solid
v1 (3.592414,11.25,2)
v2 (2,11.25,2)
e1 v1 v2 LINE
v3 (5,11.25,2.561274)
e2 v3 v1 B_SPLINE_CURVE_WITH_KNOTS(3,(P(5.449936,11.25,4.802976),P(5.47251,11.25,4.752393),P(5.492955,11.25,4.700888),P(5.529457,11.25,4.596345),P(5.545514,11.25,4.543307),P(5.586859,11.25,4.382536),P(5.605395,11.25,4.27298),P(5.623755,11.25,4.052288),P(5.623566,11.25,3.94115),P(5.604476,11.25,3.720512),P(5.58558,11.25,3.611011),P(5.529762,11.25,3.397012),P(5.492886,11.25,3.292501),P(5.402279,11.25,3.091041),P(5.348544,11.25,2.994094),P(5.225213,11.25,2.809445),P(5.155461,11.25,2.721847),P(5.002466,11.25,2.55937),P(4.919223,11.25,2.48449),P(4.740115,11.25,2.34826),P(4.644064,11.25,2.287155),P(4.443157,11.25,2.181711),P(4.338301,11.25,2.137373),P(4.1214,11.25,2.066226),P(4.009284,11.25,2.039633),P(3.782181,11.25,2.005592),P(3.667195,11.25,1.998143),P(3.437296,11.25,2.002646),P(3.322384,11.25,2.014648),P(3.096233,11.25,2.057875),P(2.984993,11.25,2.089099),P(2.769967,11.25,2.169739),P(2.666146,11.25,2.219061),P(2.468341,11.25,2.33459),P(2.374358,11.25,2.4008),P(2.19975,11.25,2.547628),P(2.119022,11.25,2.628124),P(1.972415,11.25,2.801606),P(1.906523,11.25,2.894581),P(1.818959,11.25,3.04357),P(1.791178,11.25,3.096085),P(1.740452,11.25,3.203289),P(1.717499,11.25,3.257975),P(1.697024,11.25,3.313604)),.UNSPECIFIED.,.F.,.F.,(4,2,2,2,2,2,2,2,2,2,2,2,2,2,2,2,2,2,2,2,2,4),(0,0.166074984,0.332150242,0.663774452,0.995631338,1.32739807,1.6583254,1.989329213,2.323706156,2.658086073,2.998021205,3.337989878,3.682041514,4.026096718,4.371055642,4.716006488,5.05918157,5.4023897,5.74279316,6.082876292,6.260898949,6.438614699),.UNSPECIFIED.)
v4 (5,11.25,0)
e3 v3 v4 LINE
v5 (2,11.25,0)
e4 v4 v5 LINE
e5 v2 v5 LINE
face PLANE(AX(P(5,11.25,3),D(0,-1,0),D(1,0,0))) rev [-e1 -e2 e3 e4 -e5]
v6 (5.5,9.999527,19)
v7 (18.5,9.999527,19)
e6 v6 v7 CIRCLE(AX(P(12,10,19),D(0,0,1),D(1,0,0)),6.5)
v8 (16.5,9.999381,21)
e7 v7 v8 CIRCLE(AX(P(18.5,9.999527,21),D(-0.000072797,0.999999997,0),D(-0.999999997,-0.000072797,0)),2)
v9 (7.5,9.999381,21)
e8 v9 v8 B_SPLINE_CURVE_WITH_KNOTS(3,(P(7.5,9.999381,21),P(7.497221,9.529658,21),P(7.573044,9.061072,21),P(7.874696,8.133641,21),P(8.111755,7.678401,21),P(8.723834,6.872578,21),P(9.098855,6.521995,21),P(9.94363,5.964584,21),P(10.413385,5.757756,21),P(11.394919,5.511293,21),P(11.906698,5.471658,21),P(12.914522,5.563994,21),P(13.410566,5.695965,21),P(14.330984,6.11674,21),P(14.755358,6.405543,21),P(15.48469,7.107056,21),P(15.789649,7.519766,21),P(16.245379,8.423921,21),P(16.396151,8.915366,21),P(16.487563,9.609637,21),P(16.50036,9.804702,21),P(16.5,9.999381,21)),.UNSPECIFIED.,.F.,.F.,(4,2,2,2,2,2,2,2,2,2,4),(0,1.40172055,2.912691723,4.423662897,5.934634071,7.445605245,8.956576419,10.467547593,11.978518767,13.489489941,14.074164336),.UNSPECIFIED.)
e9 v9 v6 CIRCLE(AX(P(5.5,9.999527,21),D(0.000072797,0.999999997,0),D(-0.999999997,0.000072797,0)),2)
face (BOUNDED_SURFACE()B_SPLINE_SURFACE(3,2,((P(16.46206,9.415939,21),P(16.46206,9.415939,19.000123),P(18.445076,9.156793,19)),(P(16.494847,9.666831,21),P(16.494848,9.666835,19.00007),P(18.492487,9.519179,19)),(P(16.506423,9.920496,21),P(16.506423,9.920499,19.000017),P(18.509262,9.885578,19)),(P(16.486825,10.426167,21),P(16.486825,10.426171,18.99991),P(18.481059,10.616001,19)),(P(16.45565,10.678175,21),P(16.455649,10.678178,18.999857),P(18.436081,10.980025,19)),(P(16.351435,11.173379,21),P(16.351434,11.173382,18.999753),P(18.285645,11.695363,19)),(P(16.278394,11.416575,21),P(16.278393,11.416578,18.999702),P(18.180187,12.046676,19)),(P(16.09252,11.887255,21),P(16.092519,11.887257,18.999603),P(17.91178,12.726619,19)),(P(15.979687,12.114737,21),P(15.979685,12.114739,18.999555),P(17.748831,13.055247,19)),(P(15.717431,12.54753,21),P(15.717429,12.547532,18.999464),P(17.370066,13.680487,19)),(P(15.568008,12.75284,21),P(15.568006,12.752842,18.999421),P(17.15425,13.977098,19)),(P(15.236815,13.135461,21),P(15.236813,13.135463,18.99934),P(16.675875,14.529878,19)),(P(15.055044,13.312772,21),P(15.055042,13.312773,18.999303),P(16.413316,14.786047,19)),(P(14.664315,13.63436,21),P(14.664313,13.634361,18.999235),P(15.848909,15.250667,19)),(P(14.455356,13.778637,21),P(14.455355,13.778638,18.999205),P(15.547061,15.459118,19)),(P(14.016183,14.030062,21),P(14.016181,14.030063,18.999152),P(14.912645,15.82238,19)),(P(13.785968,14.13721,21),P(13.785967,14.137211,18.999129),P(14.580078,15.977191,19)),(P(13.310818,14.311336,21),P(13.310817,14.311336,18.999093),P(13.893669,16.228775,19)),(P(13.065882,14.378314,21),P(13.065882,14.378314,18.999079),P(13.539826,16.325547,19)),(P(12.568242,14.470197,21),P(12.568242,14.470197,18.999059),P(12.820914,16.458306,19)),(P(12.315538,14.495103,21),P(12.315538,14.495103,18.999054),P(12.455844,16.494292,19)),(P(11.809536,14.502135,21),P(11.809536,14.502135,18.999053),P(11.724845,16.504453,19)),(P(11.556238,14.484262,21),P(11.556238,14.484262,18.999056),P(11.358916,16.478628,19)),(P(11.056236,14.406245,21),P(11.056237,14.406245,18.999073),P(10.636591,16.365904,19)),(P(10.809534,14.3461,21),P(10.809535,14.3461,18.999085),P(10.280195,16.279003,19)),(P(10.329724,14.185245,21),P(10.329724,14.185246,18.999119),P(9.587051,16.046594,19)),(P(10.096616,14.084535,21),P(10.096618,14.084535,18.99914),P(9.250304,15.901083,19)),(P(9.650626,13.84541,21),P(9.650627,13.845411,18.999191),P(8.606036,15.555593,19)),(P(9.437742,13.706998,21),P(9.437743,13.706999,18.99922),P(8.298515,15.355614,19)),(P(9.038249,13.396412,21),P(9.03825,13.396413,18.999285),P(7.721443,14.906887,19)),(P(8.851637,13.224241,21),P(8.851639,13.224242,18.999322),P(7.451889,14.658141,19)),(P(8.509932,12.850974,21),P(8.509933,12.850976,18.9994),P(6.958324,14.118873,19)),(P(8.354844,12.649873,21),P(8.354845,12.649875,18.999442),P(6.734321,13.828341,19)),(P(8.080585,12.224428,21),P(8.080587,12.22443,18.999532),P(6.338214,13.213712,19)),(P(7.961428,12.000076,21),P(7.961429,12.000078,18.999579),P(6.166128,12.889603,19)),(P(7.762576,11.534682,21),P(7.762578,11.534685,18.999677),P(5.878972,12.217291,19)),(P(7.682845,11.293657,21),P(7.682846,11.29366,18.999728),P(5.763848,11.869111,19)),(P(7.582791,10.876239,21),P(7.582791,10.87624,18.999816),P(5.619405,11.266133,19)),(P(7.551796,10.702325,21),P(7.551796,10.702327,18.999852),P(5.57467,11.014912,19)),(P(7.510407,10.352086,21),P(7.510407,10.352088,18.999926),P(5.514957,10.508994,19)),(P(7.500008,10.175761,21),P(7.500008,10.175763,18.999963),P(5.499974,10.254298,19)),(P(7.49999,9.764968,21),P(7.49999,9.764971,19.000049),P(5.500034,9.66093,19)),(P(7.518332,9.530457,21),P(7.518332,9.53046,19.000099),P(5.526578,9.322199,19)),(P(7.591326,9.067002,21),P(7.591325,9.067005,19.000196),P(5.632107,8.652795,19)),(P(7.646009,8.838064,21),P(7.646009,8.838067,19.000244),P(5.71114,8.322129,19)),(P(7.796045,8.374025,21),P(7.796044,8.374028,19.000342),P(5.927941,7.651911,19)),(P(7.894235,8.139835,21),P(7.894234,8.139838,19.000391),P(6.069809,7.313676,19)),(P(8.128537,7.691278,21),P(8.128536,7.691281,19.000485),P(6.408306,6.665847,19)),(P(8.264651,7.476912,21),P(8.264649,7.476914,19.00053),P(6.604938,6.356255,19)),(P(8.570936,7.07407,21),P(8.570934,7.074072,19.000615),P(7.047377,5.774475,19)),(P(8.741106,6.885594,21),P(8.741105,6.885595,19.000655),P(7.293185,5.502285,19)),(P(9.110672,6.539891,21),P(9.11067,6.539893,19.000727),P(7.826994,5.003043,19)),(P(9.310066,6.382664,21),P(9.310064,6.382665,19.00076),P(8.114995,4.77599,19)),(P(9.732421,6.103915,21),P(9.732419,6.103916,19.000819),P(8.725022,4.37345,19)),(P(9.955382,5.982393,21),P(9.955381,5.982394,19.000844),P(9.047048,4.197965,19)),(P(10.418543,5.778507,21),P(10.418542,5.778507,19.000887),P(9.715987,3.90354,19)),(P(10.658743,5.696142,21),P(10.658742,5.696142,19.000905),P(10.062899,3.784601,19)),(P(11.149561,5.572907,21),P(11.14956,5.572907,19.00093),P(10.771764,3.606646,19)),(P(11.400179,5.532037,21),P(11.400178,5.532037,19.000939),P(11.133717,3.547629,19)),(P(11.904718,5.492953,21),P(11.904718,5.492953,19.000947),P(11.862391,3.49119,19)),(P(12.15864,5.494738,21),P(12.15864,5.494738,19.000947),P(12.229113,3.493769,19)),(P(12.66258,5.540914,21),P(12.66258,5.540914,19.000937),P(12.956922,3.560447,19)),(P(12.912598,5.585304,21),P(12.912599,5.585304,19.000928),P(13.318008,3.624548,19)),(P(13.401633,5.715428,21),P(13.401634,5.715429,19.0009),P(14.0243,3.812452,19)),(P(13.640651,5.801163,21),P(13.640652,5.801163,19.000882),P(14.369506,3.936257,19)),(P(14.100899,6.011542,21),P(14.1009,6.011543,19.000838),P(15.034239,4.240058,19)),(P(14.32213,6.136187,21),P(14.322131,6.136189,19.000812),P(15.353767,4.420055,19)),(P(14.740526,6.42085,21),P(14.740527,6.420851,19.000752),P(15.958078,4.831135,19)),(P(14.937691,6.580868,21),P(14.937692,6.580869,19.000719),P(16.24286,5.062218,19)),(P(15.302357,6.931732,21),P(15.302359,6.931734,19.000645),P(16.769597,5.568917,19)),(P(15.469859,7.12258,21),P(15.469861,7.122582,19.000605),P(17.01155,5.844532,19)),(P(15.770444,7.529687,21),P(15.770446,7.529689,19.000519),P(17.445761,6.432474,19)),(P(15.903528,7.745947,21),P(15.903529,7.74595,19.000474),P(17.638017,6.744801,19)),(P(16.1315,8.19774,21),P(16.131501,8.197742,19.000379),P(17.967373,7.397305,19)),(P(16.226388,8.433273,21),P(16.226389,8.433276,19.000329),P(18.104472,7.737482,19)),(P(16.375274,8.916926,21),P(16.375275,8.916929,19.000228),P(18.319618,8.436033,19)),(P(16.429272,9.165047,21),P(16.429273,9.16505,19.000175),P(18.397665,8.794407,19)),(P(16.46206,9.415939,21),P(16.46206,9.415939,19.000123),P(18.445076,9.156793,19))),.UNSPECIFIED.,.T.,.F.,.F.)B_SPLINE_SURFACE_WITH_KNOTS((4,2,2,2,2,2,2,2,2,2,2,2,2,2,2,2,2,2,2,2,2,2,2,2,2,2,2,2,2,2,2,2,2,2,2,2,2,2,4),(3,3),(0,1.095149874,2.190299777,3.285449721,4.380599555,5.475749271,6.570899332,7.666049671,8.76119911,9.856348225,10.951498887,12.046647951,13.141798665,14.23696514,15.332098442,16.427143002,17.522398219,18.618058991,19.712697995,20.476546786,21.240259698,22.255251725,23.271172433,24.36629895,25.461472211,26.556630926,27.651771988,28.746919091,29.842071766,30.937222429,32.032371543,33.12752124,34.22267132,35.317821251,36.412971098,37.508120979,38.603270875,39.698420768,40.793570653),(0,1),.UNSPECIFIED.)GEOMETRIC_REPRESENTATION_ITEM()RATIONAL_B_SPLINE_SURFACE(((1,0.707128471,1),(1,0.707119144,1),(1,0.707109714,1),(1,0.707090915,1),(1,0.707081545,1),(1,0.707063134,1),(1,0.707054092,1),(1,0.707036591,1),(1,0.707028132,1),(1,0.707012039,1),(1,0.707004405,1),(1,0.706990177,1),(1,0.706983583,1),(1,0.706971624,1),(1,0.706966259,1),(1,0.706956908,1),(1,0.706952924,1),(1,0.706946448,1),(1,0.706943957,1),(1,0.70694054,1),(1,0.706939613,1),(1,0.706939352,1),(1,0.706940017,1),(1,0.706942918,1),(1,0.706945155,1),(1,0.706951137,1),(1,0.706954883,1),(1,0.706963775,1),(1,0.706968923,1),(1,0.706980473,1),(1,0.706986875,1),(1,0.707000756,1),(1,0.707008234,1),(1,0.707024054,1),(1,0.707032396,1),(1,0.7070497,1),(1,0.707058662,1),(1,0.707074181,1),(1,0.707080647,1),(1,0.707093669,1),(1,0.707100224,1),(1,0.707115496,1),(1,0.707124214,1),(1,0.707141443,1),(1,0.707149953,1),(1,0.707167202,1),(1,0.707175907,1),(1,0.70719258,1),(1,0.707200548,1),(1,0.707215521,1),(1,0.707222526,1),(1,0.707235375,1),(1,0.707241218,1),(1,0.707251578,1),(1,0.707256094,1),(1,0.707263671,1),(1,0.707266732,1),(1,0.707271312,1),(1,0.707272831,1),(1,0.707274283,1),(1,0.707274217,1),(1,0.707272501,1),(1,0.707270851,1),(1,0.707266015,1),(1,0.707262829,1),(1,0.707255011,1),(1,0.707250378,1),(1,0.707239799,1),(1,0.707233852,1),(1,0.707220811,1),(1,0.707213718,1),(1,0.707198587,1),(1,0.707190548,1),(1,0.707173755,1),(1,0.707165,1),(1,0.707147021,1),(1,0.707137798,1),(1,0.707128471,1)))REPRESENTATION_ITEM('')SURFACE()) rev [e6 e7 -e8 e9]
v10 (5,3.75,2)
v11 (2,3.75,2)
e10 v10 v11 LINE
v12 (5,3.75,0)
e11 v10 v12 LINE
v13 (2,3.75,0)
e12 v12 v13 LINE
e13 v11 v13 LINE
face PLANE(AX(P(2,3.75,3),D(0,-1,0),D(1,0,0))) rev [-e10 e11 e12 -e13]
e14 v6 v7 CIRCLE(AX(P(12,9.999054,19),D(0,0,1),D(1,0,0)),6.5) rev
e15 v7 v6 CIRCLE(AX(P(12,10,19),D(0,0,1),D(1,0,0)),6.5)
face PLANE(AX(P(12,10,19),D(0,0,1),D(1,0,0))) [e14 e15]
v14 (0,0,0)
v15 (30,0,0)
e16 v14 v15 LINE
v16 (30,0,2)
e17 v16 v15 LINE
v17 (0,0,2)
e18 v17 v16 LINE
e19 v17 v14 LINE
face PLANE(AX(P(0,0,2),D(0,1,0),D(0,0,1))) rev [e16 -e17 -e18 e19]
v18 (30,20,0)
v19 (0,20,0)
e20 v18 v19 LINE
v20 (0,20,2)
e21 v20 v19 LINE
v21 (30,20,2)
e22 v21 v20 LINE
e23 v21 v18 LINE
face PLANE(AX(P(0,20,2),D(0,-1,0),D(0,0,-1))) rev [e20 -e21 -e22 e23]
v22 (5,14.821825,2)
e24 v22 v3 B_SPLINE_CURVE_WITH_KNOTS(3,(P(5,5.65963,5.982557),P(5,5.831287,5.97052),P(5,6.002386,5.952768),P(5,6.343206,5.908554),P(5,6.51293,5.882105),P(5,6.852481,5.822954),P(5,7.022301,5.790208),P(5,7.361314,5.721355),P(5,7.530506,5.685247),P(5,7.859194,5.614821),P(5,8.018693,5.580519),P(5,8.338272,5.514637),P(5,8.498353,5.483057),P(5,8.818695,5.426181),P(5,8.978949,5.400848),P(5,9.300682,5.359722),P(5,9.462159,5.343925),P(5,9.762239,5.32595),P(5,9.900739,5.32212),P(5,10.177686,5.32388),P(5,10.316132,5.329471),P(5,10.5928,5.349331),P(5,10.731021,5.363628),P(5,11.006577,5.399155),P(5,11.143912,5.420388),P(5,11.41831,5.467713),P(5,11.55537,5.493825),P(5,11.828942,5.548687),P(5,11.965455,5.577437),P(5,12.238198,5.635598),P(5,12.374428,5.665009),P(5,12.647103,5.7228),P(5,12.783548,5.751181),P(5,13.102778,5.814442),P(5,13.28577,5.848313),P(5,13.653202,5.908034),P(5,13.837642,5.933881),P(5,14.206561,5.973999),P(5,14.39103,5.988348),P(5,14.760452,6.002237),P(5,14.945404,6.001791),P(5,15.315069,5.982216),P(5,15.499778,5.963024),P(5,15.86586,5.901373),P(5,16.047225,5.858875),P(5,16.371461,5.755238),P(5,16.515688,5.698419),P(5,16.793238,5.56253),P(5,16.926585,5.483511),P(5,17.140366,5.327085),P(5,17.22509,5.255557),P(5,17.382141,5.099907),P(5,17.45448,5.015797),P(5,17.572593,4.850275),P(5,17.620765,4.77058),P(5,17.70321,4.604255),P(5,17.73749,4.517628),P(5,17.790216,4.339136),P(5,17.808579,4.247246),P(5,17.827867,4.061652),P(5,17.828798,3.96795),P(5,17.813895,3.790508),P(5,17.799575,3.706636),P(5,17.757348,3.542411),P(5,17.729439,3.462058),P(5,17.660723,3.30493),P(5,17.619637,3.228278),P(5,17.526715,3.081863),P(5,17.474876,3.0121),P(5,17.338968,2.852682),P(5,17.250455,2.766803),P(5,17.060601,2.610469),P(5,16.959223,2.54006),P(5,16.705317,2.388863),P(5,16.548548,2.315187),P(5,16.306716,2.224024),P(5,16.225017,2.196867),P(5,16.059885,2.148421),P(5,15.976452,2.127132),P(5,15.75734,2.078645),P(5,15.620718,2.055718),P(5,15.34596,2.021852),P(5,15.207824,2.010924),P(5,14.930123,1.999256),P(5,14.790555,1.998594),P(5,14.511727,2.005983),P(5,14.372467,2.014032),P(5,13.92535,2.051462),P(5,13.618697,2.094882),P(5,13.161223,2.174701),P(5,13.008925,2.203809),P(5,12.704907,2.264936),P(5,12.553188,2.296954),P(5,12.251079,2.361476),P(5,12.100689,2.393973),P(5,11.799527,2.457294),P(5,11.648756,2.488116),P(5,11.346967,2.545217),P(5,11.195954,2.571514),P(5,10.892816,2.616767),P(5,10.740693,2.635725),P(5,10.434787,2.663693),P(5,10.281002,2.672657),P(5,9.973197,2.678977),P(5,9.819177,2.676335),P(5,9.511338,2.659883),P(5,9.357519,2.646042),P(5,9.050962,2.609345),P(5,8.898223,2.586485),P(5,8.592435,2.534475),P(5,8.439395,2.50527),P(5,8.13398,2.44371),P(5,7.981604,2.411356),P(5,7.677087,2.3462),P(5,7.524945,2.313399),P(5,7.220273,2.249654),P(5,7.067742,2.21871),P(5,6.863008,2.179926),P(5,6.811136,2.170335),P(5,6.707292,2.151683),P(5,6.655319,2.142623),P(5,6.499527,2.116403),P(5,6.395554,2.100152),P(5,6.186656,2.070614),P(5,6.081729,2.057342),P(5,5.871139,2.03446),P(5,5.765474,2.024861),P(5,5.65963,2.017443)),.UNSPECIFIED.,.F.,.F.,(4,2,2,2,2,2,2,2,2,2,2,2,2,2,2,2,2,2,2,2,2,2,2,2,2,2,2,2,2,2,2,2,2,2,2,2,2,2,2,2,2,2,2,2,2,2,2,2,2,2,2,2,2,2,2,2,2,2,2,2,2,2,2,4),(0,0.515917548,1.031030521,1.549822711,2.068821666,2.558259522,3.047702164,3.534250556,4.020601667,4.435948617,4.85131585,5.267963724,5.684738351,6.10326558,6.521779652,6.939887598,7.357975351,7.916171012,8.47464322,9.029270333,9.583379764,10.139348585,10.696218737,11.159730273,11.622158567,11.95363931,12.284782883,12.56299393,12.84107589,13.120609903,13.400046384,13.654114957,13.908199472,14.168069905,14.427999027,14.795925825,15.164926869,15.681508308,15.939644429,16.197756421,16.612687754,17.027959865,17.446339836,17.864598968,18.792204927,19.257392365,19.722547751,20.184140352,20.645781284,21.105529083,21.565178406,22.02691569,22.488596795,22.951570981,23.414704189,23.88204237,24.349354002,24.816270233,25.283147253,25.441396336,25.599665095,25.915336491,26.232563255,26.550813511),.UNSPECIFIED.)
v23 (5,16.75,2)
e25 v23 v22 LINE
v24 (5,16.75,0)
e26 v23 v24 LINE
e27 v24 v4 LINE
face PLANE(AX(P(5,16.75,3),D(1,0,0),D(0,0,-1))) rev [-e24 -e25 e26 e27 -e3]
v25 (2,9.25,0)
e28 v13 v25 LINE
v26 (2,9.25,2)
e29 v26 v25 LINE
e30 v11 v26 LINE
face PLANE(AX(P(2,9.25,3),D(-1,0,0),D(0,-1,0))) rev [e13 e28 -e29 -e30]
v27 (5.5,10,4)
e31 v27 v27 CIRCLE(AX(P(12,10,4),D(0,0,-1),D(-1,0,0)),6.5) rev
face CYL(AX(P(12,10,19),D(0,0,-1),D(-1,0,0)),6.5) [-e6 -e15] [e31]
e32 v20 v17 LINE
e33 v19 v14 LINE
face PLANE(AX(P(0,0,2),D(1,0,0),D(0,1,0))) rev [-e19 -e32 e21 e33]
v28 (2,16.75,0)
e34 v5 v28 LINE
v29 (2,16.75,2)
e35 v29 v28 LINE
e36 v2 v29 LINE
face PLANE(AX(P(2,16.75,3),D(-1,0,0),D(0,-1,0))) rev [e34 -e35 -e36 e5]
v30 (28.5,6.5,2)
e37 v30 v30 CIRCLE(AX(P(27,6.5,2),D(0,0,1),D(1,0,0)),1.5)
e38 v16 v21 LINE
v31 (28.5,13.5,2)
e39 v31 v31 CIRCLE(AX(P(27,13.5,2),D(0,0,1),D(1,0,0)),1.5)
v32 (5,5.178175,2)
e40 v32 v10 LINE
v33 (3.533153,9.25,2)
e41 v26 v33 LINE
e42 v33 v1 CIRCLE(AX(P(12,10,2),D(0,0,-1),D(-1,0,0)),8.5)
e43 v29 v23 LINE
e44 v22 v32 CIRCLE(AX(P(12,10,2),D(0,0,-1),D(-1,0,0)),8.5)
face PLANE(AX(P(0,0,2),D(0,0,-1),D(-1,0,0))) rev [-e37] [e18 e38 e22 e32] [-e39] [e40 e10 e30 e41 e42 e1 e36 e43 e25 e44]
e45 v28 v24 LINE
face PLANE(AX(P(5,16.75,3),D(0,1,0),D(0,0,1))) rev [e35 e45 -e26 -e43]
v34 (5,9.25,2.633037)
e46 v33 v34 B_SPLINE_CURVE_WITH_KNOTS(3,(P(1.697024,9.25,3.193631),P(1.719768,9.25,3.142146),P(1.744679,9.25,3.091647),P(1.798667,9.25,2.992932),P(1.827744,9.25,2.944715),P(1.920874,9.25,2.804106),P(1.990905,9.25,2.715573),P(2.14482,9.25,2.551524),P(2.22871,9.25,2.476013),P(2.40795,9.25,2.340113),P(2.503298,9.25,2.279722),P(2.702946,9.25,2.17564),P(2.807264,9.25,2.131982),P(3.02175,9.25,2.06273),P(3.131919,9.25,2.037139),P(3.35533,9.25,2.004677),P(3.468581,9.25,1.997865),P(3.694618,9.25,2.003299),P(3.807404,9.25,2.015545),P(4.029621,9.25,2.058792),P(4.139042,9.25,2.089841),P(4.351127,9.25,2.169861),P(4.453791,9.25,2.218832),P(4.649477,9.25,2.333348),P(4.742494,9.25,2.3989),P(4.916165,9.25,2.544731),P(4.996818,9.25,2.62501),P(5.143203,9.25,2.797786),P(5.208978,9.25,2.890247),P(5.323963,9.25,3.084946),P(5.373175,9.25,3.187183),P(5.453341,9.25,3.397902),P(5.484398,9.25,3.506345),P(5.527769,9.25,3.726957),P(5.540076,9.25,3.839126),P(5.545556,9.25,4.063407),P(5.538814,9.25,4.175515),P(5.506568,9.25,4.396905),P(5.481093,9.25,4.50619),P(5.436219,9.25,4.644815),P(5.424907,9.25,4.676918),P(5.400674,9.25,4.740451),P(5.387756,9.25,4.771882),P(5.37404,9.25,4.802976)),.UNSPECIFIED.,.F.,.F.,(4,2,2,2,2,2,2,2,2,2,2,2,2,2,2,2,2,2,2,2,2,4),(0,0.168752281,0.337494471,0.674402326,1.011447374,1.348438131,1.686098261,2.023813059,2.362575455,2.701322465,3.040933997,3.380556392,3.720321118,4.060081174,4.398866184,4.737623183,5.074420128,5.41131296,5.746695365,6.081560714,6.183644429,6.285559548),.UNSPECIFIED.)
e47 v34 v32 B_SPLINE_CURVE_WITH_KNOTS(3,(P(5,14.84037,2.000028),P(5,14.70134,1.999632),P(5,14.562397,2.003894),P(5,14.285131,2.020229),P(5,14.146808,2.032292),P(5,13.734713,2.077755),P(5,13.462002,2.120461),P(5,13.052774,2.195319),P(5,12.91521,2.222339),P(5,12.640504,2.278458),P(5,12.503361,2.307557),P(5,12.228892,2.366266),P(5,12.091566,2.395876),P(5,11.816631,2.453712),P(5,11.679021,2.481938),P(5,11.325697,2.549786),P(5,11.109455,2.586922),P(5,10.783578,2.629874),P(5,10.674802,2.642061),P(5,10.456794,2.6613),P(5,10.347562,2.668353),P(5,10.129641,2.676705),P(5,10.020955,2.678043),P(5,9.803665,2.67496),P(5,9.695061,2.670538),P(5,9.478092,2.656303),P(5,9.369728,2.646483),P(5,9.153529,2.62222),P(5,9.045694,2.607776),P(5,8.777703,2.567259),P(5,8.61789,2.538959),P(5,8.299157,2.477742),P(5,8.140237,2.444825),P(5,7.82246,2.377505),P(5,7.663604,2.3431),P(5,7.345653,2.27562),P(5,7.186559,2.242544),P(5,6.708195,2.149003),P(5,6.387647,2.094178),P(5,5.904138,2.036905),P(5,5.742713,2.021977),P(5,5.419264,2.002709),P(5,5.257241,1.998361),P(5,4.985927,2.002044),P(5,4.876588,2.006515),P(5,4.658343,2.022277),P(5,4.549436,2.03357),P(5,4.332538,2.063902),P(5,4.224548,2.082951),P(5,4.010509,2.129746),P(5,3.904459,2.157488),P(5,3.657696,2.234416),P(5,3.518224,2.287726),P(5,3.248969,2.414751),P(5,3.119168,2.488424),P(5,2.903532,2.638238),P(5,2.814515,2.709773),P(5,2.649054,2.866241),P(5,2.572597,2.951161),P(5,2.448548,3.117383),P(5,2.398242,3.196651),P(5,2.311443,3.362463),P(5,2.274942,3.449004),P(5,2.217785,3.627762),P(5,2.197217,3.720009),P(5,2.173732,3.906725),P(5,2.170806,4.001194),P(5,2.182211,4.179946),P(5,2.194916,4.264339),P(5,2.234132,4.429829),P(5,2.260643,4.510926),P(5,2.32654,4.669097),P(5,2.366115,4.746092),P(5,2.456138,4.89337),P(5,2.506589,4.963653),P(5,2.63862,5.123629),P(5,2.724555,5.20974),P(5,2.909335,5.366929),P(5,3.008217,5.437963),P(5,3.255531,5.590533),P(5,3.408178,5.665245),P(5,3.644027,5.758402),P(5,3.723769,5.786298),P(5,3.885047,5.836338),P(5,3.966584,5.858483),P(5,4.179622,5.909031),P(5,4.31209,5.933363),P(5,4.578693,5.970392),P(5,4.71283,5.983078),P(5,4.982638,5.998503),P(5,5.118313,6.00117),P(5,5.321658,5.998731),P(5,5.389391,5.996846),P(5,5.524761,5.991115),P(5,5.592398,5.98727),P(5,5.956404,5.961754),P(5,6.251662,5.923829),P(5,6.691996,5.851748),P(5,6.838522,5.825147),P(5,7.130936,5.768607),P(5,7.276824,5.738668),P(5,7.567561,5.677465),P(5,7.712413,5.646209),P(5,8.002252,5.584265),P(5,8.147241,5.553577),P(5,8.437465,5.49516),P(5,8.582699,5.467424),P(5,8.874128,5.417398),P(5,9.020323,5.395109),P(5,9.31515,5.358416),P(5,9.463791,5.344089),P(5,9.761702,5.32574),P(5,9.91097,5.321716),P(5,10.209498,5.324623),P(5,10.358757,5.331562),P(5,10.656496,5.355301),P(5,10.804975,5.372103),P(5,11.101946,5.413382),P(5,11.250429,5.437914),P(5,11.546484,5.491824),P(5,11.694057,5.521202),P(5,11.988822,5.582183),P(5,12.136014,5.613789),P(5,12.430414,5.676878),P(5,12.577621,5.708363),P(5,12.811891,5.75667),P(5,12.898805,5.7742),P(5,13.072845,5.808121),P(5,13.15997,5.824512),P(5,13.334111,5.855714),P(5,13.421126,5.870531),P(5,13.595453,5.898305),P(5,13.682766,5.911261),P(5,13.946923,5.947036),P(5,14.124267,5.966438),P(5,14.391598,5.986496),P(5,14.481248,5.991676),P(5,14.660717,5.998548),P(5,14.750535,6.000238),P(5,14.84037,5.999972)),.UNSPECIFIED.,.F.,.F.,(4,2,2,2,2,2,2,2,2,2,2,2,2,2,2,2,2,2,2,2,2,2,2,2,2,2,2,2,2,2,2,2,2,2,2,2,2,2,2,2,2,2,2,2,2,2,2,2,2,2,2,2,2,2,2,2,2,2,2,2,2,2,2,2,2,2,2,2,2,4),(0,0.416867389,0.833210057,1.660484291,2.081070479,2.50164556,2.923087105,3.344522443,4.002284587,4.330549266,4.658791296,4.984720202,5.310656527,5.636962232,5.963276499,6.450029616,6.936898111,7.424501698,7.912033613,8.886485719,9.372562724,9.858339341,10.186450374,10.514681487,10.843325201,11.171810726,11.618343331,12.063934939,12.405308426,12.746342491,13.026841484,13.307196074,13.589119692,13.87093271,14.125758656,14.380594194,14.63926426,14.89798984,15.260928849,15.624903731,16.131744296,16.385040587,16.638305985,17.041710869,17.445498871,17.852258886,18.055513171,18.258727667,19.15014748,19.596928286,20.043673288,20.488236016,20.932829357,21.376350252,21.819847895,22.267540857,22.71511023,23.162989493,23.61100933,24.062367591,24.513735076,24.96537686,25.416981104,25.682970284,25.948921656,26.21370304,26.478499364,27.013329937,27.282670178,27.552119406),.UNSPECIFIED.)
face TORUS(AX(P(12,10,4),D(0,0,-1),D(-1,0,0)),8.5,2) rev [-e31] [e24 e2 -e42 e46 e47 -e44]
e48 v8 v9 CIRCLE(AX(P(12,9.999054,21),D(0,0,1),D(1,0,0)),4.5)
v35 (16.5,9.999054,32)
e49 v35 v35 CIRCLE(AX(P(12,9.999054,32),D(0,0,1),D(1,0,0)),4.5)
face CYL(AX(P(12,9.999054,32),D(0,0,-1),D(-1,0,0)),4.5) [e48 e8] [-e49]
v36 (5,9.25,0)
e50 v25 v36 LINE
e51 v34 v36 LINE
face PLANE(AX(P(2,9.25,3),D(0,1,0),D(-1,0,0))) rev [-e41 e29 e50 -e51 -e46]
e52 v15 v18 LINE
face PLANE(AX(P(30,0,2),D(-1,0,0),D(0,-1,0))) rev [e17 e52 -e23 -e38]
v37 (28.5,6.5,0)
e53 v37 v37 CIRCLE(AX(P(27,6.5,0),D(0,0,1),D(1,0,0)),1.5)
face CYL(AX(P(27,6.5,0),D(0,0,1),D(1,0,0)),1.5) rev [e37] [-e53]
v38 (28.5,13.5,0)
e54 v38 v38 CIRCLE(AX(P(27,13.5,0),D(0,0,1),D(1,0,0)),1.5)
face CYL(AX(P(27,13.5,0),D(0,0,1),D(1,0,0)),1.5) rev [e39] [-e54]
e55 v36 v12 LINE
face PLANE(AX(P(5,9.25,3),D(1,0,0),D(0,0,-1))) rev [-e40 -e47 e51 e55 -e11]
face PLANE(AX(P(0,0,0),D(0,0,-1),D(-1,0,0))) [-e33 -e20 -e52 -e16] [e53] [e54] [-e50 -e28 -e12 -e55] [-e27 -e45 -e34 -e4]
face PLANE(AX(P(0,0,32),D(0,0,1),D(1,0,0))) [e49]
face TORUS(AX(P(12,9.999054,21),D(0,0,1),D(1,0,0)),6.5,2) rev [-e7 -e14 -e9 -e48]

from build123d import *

# Parameters (mm, degrees)
ESQUISSE1_W             = 30
ESQUISSE1_H             = 20
BOSS_EXTRU_1_DEPTH      = 2
ESQUISSE2_R             = 4.5
BOSS_EXTRU_2_DEPTH      = 30
ESQUISSE4_R             = 6.5
BOSS_EXTRU_3_DEPTH      = 17
CONG_1_R                = 2
ESQUISSE5_W             = 3
ESQUISSE5_H             = 5.5
ENL_V_MAT_EXTRU_1_DEPTH = 3
ESQUISSE6_R             = 1.5
ENL_V_MAT_EXTRU_2_DEPTH = 47.904157662


with BuildPart() as part:
    # Esquisse1 → Boss.-Extru.1 (new body)
    with BuildSketch(Plane.XY):
        with Locations((15, 10)):
            Rectangle(ESQUISSE1_W, ESQUISSE1_H)
    extrude(amount=BOSS_EXTRU_1_DEPTH)

    # Esquisse2 → Boss.-Extru.2 (add)
    with BuildSketch(Plane.XY.offset(2)):
        with Locations((12, 9.999053637)):
            Circle(ESQUISSE2_R)
    extrude(amount=BOSS_EXTRU_2_DEPTH)

    # Esquisse4 → Boss.-Extru.3 (add)
    with BuildSketch(Plane.XY.offset(2)):
        with Locations((12, 10)):
            Circle(ESQUISSE4_R)
    extrude(amount=BOSS_EXTRU_3_DEPTH)

    # Congé1
    cong_1_edges = [part.edges().sort_by_distance(p)[0] for p in [
        (7.5, 9.999053637, 19),
        (5.5, 10, 2),
    ]]
    fillet(cong_1_edges, radius=CONG_1_R)

    # Esquisse5 → Enlèv. mat.-Extru.1 (cut)
    with BuildSketch(Plane(origin=(0, 0, 0), x_dir=(-1, 0, 0), z_dir=(0, 0, -1))):
        with Locations((-3.5, 14)):
            Rectangle(ESQUISSE5_W, ESQUISSE5_H)
        with Locations((-3.5, 6.5)):
            Rectangle(ESQUISSE5_W, ESQUISSE5_H)
    extrude(amount=-ENL_V_MAT_EXTRU_1_DEPTH, mode=Mode.SUBTRACT)

    # Esquisse6 → Enlèv. mat.-Extru.2 (cut, through all)
    with BuildSketch(Plane.XY.offset(2)):
        with Locations((27, 13.5)):
            Circle(ESQUISSE6_R)
        with Locations((27, 6.5)):
            Circle(ESQUISSE6_R)
    extrude(amount=-ENL_V_MAT_EXTRU_2_DEPTH, mode=Mode.SUBTRACT)


solid = part.part
